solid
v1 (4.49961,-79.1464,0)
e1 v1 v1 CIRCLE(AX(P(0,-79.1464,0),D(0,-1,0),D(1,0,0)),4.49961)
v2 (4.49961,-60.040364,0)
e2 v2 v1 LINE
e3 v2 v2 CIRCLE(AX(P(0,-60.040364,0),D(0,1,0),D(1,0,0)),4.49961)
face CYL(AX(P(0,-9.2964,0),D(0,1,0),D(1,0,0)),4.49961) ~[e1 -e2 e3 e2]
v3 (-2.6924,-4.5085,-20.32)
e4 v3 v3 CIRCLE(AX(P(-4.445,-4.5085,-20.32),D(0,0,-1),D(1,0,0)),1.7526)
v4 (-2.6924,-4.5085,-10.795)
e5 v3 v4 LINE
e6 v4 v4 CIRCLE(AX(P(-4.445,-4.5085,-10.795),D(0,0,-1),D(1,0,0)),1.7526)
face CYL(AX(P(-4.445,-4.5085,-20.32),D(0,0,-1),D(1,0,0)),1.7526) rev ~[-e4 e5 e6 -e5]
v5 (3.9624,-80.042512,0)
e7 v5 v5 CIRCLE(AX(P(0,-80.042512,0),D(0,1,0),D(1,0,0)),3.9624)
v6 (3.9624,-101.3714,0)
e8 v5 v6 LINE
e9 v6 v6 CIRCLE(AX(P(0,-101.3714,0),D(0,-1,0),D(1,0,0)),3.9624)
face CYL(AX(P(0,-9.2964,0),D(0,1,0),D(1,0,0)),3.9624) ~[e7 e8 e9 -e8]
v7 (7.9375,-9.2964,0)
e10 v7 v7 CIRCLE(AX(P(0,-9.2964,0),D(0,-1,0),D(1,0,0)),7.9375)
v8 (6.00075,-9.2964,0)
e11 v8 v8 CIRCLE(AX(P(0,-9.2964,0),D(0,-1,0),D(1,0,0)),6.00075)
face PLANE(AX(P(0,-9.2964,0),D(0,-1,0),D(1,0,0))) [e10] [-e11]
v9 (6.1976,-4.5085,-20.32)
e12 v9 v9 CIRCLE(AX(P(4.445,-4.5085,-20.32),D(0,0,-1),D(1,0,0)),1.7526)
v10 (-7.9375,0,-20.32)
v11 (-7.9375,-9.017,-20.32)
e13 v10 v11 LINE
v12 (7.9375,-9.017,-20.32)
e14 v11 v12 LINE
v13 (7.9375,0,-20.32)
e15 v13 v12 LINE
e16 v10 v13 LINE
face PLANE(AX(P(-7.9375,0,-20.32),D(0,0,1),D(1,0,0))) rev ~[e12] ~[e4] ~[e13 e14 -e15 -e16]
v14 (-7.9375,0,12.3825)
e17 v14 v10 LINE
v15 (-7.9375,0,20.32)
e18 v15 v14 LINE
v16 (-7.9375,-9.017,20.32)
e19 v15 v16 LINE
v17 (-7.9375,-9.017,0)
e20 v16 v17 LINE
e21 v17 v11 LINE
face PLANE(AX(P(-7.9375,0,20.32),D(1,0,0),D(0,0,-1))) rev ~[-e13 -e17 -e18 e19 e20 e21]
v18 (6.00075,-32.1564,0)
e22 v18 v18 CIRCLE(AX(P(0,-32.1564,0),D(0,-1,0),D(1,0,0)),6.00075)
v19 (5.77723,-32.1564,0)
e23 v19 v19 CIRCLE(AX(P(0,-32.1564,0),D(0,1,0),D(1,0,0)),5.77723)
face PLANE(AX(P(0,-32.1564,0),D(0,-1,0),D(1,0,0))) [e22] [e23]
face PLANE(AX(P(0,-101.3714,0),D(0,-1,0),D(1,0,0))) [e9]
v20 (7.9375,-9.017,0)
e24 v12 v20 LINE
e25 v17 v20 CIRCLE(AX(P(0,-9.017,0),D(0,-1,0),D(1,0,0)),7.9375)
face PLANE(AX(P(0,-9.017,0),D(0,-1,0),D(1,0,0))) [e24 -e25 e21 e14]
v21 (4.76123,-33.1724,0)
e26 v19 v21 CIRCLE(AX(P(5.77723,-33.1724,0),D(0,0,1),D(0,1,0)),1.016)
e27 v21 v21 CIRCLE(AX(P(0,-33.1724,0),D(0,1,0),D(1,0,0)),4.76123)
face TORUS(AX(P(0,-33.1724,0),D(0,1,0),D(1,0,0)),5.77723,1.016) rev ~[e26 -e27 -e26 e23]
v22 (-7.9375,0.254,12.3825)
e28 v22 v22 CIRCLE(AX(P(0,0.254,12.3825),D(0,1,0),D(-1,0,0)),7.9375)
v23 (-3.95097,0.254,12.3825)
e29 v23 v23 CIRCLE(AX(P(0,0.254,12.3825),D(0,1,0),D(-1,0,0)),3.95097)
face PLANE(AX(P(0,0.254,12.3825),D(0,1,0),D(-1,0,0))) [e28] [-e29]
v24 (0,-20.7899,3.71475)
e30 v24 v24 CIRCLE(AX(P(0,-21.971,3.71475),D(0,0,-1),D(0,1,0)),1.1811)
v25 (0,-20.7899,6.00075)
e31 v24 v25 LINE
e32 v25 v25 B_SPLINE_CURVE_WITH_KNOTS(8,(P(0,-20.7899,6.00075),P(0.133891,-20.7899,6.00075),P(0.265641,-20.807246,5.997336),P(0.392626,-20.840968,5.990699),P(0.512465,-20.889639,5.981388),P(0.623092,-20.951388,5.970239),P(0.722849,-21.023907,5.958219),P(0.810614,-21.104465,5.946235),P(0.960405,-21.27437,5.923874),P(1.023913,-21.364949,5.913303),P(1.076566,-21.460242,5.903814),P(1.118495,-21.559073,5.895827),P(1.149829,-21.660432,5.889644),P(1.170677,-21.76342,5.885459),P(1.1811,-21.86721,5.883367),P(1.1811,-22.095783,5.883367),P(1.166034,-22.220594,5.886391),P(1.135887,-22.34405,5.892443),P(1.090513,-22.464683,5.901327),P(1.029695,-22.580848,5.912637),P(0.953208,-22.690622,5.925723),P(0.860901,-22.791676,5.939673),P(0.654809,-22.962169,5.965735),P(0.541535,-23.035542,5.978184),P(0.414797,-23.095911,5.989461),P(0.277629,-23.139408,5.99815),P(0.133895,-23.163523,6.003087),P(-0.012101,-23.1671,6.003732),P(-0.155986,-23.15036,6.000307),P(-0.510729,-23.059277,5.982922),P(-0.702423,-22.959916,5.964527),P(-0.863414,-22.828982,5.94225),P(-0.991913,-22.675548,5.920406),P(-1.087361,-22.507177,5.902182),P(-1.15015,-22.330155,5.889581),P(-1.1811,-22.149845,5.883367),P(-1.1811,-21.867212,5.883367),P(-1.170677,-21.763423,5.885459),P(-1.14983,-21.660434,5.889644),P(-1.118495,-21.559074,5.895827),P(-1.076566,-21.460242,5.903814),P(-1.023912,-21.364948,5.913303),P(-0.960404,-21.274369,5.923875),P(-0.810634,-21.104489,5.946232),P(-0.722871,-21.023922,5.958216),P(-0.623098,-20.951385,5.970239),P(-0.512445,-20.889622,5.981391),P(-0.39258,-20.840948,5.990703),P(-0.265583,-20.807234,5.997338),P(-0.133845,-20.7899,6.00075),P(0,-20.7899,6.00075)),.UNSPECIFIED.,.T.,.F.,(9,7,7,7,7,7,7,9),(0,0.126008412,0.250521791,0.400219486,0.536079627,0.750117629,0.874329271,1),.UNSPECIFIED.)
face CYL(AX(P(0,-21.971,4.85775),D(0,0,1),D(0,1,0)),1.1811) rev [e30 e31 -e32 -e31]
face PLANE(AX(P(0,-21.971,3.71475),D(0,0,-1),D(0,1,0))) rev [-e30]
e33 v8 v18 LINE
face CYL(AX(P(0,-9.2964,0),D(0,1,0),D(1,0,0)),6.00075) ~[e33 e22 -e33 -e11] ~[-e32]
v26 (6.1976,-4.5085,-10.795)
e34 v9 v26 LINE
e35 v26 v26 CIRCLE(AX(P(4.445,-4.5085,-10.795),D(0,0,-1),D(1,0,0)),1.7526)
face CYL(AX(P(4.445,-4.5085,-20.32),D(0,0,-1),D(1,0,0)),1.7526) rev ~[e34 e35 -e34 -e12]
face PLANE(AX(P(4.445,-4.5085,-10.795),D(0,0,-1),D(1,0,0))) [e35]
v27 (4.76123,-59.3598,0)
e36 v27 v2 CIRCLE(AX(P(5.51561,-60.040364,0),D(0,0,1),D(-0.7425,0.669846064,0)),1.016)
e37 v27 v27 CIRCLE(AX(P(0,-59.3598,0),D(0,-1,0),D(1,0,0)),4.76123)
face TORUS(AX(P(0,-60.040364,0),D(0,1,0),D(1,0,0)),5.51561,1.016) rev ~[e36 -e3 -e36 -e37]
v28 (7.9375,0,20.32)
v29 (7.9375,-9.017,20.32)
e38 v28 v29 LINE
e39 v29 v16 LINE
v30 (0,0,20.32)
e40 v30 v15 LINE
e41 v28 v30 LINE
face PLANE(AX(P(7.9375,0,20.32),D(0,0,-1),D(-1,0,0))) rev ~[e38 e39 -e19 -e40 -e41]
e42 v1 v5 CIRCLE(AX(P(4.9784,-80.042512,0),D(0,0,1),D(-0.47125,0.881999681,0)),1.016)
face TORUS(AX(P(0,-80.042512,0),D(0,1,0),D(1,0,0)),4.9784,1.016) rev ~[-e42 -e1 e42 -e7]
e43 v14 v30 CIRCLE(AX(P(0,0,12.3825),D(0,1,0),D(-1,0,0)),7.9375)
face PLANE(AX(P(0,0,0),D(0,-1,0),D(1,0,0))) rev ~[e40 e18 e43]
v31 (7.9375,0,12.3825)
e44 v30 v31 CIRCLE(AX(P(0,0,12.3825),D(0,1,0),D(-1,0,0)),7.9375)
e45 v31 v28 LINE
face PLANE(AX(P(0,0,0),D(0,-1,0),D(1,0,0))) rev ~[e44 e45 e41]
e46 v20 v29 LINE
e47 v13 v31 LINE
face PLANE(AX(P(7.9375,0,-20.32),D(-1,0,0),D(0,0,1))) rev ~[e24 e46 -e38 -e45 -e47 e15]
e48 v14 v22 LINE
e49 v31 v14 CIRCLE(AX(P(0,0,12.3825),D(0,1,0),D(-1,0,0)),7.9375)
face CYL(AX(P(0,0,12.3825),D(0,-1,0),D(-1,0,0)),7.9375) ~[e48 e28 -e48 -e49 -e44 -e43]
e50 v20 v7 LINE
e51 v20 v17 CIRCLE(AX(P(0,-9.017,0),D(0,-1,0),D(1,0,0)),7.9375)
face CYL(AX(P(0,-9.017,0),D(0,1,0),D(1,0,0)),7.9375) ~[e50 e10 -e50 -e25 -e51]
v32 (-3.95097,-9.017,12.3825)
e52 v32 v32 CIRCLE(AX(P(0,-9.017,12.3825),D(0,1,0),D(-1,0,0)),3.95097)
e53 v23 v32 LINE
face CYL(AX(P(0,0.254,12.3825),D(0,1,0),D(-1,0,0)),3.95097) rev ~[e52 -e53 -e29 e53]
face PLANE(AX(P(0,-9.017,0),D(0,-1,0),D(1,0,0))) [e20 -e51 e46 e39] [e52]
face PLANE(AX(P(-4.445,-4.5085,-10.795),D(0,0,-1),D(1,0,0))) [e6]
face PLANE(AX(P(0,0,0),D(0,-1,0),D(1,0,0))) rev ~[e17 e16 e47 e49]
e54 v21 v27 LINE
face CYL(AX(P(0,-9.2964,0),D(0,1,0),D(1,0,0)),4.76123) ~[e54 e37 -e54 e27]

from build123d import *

# Parameters (mm, degrees)
F1_DEPTH  = 9.017
F2_R      = 7.9375
F3_DEPTH  = 0.2794
F4_R      = 6.00075
F5_DEPTH  = 22.86
F6_R      = 4.76123
F7_DEPTH  = 50.0634
F8_R      = 4.49961
F9_DEPTH  = 69.85
F10_R     = 3.9624
F11_DEPTH = 92.075
F15_W     = 1.1811
F15_H     = 2.286
F17_R     = 7.9375
F18_DEPTH = 0.254
F19_R     = 3.95097
F20_DEPTH = 25.4
F21_R     = 1.7526
F22_DEPTH = 9.525


# Not quite as in the source:
# - a fillet or chamfer that OpenCascade refuses, or shapes differently, is made with other operations: its cross-section is extruded or revolved along the edge and cut away or added
# - a feature of the source that left no trace in its solid (it failed there, or was rolled back) is left out


with BuildPart() as f1:
    # F0 (on Front) → F1 (new body)
    with BuildSketch(Plane.XZ):
        Polygon((7.9375, 20.32), (0, 20.32), (-7.9375, 20.32), (-7.9375, 0), (-7.9375, -20.32), (0, -20.32), (7.9375, -20.32), (7.9375, 0), align=None)
    extrude(amount=F1_DEPTH)

    # F2 (on face) → F3 (join)
    with BuildSketch(Plane.XZ.offset(9.017)):
        Circle(F2_R)
    extrude(amount=F3_DEPTH)

    # F4 (on face) → F5 (join)
    with BuildSketch(Plane.XZ.offset(9.2964)):
        Circle(F4_R)
    extrude(amount=F5_DEPTH)

    # F6 (on face) → F7 (join)
    with BuildSketch(Plane.XZ.offset(9.2964)):
        Circle(F6_R)
    extrude(amount=F7_DEPTH)

    # F8 (on face) → F9 (join)
    with BuildSketch(Plane.XZ.offset(9.2964)):
        Circle(F8_R)
    extrude(amount=F9_DEPTH)

    # F10 (on face) → F11 (join)
    with BuildSketch(Plane.XZ.offset(9.2964)):
        Circle(F10_R)
    extrude(amount=F11_DEPTH)

    # F14: fillet of radius 1.016 on 3 edges, made by hand

    # F14_s1 → F14_t2 (revolve)
    with BuildSketch(Plane.XY):
        with BuildLine():
            ThreePointArc((5.77723, -32.1564), (5.0588095103, -32.4539795103), (4.76123, -33.1724))
            Line((4.76123, -33.1724), (4.76123, -32.1564))
            Line((4.76123, -32.1564), (5.77723, -32.1564))
        make_face()
    revolve(axis=Axis((0, -32.1564, 0), (0, 1, 0)))

    # F14_s3 → F14_t4 (revolve)
    with BuildSketch(Plane.XY):
        with BuildLine():
            ThreePointArc((4.76123, -59.3598), (4.5672677411, -59.675805019), (4.49961, -60.0403636014))
            Line((4.49961, -60.0403636014), (4.49961, -59.3598))
            Line((4.49961, -59.3598), (4.76123, -59.3598))
        make_face()
    revolve(axis=Axis((0, -59.3598, 0), (0, 1, 0)))

    # F14_s5 → F14_t6 (revolve)
    with BuildSketch(Plane.XY):
        with BuildLine():
            ThreePointArc((4.49961, -79.1464), (4.1069911866, -79.5201107955), (3.9624, -80.042511676))
            Line((3.9624, -80.042511676), (3.9624, -79.1464))
            Line((3.9624, -79.1464), (4.49961, -79.1464))
        make_face()
    revolve(axis=Axis((0, -79.1464, 0), (0, 1, 0)))

    # F15 (on Right) → F16 (revolve, cut)
    with BuildSketch(Plane.YZ):
        with Locations((-21.38045, 4.85775)):
            Rectangle(F15_W, F15_H)
    revolve(axis=Axis((0, -21.971, 4.85775), (0, 0, -1)), mode=Mode.SUBTRACT)

    # F17 (on face) → F18 (join)
    with BuildSketch(Plane(origin=(0, 0, 0), x_dir=(-1, 0, 0), z_dir=(0, 1, 0))):
        with Locations((0, 12.3825)):
            Circle(F17_R)
    extrude(amount=F18_DEPTH)

    # F19 (on face) → F20 (cut)
    with BuildSketch(Plane(origin=(0, 0.254, 0), x_dir=(-1, 0, 0), z_dir=(0, 1, 0))):
        with Locations((0, 12.3825)):
            Circle(F19_R)
    extrude(amount=-F20_DEPTH, mode=Mode.SUBTRACT)

    # F21 (on face) → F22 (cut)
    with BuildSketch(Plane(origin=(0, 0, -20.32), x_dir=(1, 0, 0), z_dir=(0, 0, -1))):
        with Locations((4.445, 4.5085)):
            Circle(F21_R)
        with Locations((-4.445, 4.5085)):
            Circle(F21_R)
    extrude(amount=-F22_DEPTH, mode=Mode.SUBTRACT)


solid = f1.part
